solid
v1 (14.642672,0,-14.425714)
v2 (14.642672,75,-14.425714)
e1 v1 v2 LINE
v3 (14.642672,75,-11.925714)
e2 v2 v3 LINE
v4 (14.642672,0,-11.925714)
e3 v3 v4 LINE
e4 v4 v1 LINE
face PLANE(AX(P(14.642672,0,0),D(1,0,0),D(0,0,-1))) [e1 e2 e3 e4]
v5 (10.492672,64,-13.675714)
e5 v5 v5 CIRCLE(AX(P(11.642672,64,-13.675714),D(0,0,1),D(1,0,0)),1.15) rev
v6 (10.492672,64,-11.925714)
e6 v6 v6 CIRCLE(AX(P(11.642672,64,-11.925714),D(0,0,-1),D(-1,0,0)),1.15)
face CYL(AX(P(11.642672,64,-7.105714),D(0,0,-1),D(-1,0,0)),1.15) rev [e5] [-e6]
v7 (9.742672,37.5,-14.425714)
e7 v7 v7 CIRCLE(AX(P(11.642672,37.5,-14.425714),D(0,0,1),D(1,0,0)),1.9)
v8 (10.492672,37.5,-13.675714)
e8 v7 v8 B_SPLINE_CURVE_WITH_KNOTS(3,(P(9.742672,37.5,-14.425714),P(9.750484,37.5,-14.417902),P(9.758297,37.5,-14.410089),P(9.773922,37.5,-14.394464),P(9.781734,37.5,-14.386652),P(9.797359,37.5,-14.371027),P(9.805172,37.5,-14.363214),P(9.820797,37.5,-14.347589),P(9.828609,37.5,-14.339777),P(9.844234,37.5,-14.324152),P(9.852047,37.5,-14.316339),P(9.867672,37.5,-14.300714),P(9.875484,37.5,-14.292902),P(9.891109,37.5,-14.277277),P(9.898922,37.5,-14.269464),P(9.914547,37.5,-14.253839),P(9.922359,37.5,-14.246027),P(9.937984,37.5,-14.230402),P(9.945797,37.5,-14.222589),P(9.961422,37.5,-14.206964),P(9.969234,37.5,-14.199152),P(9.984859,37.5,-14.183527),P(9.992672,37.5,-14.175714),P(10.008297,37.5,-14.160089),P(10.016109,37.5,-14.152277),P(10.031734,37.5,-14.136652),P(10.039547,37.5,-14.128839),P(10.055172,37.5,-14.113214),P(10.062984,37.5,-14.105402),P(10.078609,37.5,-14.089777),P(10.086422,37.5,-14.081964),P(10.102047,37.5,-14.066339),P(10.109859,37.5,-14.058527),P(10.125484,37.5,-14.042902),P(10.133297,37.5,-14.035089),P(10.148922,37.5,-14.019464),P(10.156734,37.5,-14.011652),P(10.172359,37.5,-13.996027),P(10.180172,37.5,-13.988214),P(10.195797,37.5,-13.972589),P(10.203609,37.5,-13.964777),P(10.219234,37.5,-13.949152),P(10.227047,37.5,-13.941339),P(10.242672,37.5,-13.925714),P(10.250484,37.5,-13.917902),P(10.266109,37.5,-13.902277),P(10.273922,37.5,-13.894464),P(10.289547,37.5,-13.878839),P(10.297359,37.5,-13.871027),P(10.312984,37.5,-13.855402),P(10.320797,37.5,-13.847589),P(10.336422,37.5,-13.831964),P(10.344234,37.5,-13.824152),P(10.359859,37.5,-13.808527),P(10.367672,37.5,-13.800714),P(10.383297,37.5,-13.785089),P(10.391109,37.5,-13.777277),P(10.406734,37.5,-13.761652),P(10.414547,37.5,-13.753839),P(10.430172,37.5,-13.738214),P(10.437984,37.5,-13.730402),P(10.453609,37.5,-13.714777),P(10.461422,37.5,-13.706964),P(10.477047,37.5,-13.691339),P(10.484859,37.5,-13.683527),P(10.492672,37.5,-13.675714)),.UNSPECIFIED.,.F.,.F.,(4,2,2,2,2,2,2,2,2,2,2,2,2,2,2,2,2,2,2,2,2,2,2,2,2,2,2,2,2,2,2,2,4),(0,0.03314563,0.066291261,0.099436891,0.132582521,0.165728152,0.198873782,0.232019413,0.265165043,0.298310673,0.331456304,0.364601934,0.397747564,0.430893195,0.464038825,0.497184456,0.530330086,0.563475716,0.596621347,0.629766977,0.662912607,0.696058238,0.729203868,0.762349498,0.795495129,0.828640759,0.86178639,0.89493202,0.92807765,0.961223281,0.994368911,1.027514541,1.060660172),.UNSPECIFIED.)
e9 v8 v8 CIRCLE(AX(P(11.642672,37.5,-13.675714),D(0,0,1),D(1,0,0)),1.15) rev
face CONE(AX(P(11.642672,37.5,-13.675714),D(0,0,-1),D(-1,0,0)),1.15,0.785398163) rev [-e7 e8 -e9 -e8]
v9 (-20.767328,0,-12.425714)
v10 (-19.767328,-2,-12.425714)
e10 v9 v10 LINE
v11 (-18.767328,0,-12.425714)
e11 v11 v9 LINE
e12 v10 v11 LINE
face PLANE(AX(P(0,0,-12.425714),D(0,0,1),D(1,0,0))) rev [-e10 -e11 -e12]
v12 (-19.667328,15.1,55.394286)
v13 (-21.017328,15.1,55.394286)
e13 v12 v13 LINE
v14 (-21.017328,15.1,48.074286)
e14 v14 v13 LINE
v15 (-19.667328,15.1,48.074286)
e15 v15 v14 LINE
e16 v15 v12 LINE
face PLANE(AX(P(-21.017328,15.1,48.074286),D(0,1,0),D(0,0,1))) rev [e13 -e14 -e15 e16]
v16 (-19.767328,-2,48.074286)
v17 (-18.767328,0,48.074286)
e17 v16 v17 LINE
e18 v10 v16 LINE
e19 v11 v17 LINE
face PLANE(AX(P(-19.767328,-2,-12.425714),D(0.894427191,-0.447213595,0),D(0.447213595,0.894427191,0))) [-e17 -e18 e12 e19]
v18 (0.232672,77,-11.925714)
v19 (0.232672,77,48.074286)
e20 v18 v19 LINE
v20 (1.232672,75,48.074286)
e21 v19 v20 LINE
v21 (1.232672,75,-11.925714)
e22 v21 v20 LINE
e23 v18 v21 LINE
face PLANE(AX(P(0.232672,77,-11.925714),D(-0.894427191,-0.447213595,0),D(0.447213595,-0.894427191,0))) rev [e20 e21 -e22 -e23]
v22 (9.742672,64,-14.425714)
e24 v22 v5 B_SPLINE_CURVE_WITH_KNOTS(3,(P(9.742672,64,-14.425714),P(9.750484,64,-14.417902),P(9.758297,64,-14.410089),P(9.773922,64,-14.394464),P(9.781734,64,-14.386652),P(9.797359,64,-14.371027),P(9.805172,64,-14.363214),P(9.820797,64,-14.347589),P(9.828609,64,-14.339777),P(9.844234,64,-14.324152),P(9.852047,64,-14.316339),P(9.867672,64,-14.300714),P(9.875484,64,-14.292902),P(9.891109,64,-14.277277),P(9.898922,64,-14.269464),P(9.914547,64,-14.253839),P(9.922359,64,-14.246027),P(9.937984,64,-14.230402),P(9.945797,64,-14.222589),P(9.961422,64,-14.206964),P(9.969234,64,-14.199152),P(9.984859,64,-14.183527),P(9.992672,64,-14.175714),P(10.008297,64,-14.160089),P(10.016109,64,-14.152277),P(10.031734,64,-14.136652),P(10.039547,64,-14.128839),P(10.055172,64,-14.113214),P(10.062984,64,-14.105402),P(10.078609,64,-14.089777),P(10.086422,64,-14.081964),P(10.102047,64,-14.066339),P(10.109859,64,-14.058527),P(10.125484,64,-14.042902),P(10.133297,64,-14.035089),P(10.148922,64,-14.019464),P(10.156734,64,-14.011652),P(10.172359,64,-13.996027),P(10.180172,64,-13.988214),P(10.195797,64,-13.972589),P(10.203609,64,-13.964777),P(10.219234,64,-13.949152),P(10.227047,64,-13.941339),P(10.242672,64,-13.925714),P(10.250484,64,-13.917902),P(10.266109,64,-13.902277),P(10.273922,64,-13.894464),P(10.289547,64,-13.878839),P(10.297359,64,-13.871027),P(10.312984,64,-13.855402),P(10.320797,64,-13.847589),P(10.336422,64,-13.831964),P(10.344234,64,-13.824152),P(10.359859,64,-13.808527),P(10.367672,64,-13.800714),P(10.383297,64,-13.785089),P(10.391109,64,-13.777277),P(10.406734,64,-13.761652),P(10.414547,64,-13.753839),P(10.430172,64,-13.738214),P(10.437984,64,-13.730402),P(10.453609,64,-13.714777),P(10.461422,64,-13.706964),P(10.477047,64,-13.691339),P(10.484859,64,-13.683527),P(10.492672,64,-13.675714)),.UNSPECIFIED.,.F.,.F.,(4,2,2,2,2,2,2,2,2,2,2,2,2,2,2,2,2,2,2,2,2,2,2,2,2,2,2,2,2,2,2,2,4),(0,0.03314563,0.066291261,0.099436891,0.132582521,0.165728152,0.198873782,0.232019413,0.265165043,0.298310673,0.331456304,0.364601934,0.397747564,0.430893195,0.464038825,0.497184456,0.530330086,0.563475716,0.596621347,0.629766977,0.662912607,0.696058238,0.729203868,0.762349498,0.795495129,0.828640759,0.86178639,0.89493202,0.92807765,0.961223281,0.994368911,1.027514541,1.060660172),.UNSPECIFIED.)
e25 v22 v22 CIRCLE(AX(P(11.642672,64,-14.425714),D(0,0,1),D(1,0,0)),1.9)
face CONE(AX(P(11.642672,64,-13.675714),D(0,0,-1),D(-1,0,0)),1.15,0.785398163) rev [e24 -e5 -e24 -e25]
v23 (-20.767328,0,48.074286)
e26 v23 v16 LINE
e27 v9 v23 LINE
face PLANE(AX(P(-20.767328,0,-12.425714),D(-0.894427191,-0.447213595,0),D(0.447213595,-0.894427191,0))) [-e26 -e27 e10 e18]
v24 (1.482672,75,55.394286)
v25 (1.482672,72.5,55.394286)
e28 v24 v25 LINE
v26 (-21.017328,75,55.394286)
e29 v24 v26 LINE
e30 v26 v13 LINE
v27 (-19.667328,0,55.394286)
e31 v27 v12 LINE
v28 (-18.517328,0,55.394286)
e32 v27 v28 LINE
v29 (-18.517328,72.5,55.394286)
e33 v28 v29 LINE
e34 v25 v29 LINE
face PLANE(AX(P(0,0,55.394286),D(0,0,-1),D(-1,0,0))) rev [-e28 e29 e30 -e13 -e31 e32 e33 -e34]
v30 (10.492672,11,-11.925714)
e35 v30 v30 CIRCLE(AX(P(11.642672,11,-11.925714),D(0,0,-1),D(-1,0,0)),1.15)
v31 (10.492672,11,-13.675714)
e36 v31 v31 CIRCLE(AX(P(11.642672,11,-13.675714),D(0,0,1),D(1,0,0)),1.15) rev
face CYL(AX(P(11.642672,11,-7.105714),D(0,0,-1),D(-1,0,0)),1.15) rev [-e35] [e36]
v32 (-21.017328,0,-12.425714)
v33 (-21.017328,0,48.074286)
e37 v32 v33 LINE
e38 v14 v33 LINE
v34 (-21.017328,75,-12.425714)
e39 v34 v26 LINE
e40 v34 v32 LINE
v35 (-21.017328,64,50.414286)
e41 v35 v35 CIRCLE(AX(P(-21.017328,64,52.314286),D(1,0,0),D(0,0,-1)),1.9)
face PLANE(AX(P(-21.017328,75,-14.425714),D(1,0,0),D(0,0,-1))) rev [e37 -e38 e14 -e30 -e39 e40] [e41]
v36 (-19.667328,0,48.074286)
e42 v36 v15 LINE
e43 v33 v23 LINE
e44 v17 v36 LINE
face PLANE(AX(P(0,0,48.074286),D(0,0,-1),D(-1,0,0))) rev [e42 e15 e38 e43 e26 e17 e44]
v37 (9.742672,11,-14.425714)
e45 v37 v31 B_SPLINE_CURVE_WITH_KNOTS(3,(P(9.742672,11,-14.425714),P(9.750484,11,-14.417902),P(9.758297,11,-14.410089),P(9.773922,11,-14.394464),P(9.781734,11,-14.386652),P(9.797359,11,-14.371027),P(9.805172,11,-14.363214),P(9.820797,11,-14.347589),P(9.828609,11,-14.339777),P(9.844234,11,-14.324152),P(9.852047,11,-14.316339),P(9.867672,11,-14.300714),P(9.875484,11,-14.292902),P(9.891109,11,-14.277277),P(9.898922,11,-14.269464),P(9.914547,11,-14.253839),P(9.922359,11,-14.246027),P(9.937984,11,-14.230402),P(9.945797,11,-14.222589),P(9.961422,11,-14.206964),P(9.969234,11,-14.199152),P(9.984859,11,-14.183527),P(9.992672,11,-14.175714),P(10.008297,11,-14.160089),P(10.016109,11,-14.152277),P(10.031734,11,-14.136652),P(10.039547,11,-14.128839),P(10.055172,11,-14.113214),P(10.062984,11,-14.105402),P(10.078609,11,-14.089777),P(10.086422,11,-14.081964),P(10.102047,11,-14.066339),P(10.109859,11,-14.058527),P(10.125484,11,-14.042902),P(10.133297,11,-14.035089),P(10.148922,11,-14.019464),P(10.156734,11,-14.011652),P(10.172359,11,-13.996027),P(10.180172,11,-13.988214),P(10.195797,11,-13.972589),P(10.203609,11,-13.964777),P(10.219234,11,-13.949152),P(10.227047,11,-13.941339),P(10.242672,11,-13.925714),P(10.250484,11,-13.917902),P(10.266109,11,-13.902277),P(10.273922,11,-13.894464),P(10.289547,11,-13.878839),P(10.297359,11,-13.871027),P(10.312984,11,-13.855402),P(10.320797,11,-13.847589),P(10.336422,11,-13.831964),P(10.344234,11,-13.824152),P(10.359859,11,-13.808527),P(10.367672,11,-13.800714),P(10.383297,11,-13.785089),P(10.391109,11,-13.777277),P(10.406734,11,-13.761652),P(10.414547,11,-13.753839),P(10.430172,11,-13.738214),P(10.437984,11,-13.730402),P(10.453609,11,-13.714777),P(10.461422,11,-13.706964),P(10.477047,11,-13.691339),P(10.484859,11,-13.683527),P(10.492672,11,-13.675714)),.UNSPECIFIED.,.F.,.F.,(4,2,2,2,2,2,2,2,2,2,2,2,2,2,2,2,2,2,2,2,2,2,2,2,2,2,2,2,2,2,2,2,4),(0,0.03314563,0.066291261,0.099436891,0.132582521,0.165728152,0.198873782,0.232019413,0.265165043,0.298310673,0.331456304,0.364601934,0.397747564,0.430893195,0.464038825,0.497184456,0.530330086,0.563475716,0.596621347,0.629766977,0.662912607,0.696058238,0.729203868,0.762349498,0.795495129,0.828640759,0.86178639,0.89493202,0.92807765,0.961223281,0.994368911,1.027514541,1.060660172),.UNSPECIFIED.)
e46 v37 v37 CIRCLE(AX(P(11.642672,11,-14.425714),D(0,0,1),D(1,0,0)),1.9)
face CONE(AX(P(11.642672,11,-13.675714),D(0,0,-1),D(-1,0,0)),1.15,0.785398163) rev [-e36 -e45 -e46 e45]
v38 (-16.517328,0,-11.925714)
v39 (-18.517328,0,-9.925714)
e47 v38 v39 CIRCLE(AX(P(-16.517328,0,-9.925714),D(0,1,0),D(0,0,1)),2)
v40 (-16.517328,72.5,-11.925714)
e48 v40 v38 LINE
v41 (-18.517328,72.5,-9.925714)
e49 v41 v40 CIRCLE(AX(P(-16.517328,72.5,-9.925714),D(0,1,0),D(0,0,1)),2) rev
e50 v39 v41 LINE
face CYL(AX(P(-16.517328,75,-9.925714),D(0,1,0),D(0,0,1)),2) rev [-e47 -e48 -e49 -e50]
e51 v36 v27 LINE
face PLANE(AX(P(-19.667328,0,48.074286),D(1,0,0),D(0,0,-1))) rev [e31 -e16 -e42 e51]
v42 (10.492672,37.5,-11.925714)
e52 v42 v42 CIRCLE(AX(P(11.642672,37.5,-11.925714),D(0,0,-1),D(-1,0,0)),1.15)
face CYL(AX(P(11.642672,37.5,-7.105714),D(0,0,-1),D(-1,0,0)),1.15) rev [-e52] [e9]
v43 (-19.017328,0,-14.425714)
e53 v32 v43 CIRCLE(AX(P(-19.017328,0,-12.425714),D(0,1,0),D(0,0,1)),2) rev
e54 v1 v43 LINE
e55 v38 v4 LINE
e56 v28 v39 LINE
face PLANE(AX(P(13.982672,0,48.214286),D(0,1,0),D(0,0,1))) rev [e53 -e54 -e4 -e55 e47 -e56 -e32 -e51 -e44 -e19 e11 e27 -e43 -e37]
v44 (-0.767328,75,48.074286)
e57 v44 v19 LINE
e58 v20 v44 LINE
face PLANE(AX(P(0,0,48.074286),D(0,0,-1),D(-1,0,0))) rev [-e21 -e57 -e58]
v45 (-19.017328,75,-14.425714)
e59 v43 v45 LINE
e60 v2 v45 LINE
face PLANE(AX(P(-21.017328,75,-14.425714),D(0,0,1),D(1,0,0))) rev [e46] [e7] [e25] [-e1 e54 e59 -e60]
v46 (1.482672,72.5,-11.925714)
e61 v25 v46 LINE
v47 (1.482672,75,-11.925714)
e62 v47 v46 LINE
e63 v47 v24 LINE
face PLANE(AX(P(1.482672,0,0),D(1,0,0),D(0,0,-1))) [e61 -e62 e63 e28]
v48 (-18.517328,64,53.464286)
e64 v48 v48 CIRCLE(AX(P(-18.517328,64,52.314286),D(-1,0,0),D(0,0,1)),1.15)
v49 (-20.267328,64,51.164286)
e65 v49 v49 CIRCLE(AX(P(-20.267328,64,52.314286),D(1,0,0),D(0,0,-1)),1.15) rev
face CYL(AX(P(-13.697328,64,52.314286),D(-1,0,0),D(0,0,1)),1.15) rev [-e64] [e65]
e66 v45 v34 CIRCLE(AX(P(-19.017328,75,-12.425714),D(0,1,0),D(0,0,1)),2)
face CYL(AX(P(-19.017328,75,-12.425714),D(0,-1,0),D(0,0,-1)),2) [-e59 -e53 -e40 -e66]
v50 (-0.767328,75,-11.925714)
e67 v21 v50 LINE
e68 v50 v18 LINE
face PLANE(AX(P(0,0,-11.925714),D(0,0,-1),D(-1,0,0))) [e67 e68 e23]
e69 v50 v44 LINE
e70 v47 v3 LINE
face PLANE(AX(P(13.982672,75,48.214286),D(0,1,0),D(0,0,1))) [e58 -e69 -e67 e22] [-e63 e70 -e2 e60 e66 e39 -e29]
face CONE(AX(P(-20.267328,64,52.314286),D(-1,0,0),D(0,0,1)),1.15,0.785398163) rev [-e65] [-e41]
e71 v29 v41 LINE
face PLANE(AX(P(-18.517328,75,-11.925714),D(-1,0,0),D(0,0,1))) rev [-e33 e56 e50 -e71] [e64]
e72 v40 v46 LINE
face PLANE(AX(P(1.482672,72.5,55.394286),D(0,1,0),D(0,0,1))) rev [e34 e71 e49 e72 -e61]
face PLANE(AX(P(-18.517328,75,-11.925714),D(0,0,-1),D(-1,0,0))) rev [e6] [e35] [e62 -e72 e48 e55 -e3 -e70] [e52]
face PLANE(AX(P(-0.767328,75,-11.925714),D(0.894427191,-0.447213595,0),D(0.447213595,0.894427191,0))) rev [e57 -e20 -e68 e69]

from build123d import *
from OCP.BRepAlgoAPI import BRepAlgoAPI_Cut
from OCP.TopTools import TopTools_ListOfShape

# Parameters (mm, degrees)
BOSS_EXTRUDE1_DEPTH = 75
FILLET1_R           = 2
SKETCH4_W           = 25.830037715
SKETCH4_H           = 76.964783177
CUT_EXTRUDE3_DEPTH  = 10
SKETCH7_W           = 75
SKETCH7_H           = 2.5
BOSS_EXTRUDE2_DEPTH = 7.180004
SKETCH9_W           = 2.5
SKETCH9_H           = 75
BOSS_EXTRUDE3_DEPTH = 20
SKETCH10_W          = 68.5
SKETCH10_H          = 2.5
BOSS_EXTRUDE4_DEPTH = 20
BOSS_EXTRUDE5_START = -67.82
BOSS_EXTRUDE5_DEPTH = 67.82
CUT_EXTRUDE4_DEPTH  = 7.32
SKETCH13_W          = 1.35
SKETCH13_H          = 15.1
CUT_EXTRUDE5_DEPTH  = 7.32
SKETCH15_R          = 1.15
CUT_EXTRUDE6_DEPTH  = 7.32
SKETCH16_R          = 1.15
CUT_EXTRUDE7_DEPTH  = 7.32
BOSS_EXTRUDE8_DEPTH = 59.999996
CHAMFER1_SIZE       = 0.75
CHAMFER2_SIZE       = 0.75


with BuildPart() as part:
    # Sketch1 → Boss-Extrude1 (new body)
    with BuildSketch(Plane(origin=(0, 0, 0), x_dir=(1, 0, 0), z_dir=(0, 1, 0))):
        with BuildLine():
            Line((-20.27294978, -55.394285714), (-17.826119678, -54.881428571))
            ThreePointArc((-17.826119678, -54.881428571), (-18.344064324, -51.565724334), (-18.517328344, -48.214285714))
            Line((-18.517328344, -48.214285714), (-18.517328344, 11.925714286))
            Line((-18.517328344, 11.925714286), (-5.357328344, 11.925714286))
            Line((-5.357328344, 11.925714286), (-5.357328344, 14.425714286))
            Line((-5.357328344, 14.425714286), (-21.017328344, 14.425714286))
            Line((-21.017328344, 14.425714286), (-21.017328344, -48.214285714))
            ThreePointArc((-21.017328344, -48.214285714), (-20.830736323, -51.823527305), (-20.27294978, -55.394285714))
        make_face()
    extrude(amount=BOSS_EXTRUDE1_DEPTH)

    # Fillet1
    fillet1_edges = [part.edges().sort_by_distance(p)[0] for p in [
        (-21.017328344, 37.5, -14.425714286),
        (-18.517328344, 37.5, -11.925714286),
    ]]
    fillet(fillet1_edges, radius=FILLET1_R)

    # Sketch4 → Cut-Extrude3 (cut)
    with BuildSketch(Plane(origin=(-18.517328344, 0, 0), x_dir=(0, 0, -1), z_dir=(1, 0, 0))):
        with Locations((-51.201481413, 38.482391589)):
            Rectangle(SKETCH4_W, SKETCH4_H)
    extrude(amount=CUT_EXTRUDE3_DEPTH, mode=Mode.SUBTRACT)

    # Sketch7 → Boss-Extrude2 (add)
    with BuildSketch(Plane(origin=(0, 0, 48.214285714), x_dir=(0, -1, 0), z_dir=(0, 0, 1))):
        with Locations((-37.5, -19.767328344)):
            Rectangle(SKETCH7_W, SKETCH7_H)
    extrude(amount=BOSS_EXTRUDE2_DEPTH)

    # Sketch9 → Boss-Extrude3 (add)
    with BuildSketch(Plane(origin=(-5.357328344, 0, 0), x_dir=(0, 0, -1), z_dir=(1, 0, 0))):
        with Locations((13.175714286, 37.5)):
            Rectangle(SKETCH9_W, SKETCH9_H)
    extrude(amount=BOSS_EXTRUDE3_DEPTH)

    # Sketch10 → Boss-Extrude4 (add)
    with BuildSketch(Plane(origin=(-18.517328344, 0, 0), x_dir=(0, 0, -1), z_dir=(1, 0, 0))):
        with Locations((-21.144285714, 73.75)):
            Rectangle(SKETCH10_W, SKETCH10_H)
    extrude(amount=BOSS_EXTRUDE4_DEPTH)

    # Sketch11 → Boss-Extrude5 (add)
    with BuildSketch(Plane.XY.offset(55.394285714).offset(BOSS_EXTRUDE5_START)):
        Polygon((-20.767328344, 0), (-18.767328344, 0), (-19.767328344, -2), align=None)
    extrude(amount=BOSS_EXTRUDE5_DEPTH)

    # Sketch12 → Cut-Extrude4 (cut)
    with BuildSketch(Plane.XY.offset(55.394285714)):
        Polygon((-20.767328344, 0), (-18.767328344, 0), (-19.767328344, -2), align=None)
    extrude(amount=-CUT_EXTRUDE4_DEPTH, mode=Mode.SUBTRACT)


with BuildPart() as cut_extrude5_tool:
    # Sketch13 → Cut-Extrude5 (new body)
    with BuildSketch(Plane.XY.offset(55.394285714)):
        with Locations((-20.342328344, 7.55)):
            Rectangle(SKETCH13_W, SKETCH13_H)
    extrude(amount=-CUT_EXTRUDE5_DEPTH)


with BuildPart() as part_1:
    add(part.part)

    # Cut-Extrude5: cut by cut_extrude5_tool, with a tolerance
    cut_extrude5_stock = TopTools_ListOfShape()
    cut_extrude5_stock.Append(part_1.part.wrapped)
    cut_extrude5_tools = TopTools_ListOfShape()
    cut_extrude5_tools.Append(cut_extrude5_tool.part.wrapped)
    cut_extrude5_cut = BRepAlgoAPI_Cut()
    cut_extrude5_cut.SetArguments(cut_extrude5_stock)
    cut_extrude5_cut.SetTools(cut_extrude5_tools)
    cut_extrude5_cut.SetFuzzyValue(0.00001)
    cut_extrude5_cut.Build()
    add(Compound.cast(cut_extrude5_cut.Shape()).solids(), mode=Mode.REPLACE)

    # Sketch15 → Cut-Extrude6 (cut)
    with BuildSketch(Plane(origin=(0, 0, -14.425714286), x_dir=(-1, 0, 0), z_dir=(0, 0, -1))):
        with Locations((-11.642671656, 64)):
            Circle(SKETCH15_R)
        with Locations((-11.642671656, 37.5)):
            Circle(SKETCH15_R)
        with Locations((-11.642671656, 11)):
            Circle(SKETCH15_R)
    extrude(amount=-CUT_EXTRUDE6_DEPTH, mode=Mode.SUBTRACT)

    # Sketch16 → Cut-Extrude7 (cut)
    with BuildSketch(Plane.ZY.offset(21.017328344)):
        with Locations((52.314285714, 64)):
            Circle(SKETCH16_R)
    extrude(amount=-CUT_EXTRUDE7_DEPTH, mode=Mode.SUBTRACT)

    # Sketch14 → Boss-Extrude8 (add)
    with BuildSketch(Plane.XY.offset(48.074285714)):
        Polygon((1.232671656, 75), (-0.767328344, 75), (0.232671656, 77), align=None)
    extrude(amount=-BOSS_EXTRUDE8_DEPTH)

    # Chamfer1
    chamfer1_edges = [part_1.edges().sort_by_distance(p)[0] for p in [
        (-21.017328344, 64, 51.164285714),
    ]]
    chamfer(chamfer1_edges, length=CHAMFER1_SIZE)

    # Chamfer2
    chamfer2_edges = [part_1.edges().sort_by_distance(p)[0] for p in [
        (12.792671656, 64, -14.425714286),
        (12.792671656, 37.5, -14.425714286),
        (12.792671656, 11, -14.425714286),
    ]]
    chamfer(chamfer2_edges, length=CHAMFER2_SIZE)


solid = part_1.part
